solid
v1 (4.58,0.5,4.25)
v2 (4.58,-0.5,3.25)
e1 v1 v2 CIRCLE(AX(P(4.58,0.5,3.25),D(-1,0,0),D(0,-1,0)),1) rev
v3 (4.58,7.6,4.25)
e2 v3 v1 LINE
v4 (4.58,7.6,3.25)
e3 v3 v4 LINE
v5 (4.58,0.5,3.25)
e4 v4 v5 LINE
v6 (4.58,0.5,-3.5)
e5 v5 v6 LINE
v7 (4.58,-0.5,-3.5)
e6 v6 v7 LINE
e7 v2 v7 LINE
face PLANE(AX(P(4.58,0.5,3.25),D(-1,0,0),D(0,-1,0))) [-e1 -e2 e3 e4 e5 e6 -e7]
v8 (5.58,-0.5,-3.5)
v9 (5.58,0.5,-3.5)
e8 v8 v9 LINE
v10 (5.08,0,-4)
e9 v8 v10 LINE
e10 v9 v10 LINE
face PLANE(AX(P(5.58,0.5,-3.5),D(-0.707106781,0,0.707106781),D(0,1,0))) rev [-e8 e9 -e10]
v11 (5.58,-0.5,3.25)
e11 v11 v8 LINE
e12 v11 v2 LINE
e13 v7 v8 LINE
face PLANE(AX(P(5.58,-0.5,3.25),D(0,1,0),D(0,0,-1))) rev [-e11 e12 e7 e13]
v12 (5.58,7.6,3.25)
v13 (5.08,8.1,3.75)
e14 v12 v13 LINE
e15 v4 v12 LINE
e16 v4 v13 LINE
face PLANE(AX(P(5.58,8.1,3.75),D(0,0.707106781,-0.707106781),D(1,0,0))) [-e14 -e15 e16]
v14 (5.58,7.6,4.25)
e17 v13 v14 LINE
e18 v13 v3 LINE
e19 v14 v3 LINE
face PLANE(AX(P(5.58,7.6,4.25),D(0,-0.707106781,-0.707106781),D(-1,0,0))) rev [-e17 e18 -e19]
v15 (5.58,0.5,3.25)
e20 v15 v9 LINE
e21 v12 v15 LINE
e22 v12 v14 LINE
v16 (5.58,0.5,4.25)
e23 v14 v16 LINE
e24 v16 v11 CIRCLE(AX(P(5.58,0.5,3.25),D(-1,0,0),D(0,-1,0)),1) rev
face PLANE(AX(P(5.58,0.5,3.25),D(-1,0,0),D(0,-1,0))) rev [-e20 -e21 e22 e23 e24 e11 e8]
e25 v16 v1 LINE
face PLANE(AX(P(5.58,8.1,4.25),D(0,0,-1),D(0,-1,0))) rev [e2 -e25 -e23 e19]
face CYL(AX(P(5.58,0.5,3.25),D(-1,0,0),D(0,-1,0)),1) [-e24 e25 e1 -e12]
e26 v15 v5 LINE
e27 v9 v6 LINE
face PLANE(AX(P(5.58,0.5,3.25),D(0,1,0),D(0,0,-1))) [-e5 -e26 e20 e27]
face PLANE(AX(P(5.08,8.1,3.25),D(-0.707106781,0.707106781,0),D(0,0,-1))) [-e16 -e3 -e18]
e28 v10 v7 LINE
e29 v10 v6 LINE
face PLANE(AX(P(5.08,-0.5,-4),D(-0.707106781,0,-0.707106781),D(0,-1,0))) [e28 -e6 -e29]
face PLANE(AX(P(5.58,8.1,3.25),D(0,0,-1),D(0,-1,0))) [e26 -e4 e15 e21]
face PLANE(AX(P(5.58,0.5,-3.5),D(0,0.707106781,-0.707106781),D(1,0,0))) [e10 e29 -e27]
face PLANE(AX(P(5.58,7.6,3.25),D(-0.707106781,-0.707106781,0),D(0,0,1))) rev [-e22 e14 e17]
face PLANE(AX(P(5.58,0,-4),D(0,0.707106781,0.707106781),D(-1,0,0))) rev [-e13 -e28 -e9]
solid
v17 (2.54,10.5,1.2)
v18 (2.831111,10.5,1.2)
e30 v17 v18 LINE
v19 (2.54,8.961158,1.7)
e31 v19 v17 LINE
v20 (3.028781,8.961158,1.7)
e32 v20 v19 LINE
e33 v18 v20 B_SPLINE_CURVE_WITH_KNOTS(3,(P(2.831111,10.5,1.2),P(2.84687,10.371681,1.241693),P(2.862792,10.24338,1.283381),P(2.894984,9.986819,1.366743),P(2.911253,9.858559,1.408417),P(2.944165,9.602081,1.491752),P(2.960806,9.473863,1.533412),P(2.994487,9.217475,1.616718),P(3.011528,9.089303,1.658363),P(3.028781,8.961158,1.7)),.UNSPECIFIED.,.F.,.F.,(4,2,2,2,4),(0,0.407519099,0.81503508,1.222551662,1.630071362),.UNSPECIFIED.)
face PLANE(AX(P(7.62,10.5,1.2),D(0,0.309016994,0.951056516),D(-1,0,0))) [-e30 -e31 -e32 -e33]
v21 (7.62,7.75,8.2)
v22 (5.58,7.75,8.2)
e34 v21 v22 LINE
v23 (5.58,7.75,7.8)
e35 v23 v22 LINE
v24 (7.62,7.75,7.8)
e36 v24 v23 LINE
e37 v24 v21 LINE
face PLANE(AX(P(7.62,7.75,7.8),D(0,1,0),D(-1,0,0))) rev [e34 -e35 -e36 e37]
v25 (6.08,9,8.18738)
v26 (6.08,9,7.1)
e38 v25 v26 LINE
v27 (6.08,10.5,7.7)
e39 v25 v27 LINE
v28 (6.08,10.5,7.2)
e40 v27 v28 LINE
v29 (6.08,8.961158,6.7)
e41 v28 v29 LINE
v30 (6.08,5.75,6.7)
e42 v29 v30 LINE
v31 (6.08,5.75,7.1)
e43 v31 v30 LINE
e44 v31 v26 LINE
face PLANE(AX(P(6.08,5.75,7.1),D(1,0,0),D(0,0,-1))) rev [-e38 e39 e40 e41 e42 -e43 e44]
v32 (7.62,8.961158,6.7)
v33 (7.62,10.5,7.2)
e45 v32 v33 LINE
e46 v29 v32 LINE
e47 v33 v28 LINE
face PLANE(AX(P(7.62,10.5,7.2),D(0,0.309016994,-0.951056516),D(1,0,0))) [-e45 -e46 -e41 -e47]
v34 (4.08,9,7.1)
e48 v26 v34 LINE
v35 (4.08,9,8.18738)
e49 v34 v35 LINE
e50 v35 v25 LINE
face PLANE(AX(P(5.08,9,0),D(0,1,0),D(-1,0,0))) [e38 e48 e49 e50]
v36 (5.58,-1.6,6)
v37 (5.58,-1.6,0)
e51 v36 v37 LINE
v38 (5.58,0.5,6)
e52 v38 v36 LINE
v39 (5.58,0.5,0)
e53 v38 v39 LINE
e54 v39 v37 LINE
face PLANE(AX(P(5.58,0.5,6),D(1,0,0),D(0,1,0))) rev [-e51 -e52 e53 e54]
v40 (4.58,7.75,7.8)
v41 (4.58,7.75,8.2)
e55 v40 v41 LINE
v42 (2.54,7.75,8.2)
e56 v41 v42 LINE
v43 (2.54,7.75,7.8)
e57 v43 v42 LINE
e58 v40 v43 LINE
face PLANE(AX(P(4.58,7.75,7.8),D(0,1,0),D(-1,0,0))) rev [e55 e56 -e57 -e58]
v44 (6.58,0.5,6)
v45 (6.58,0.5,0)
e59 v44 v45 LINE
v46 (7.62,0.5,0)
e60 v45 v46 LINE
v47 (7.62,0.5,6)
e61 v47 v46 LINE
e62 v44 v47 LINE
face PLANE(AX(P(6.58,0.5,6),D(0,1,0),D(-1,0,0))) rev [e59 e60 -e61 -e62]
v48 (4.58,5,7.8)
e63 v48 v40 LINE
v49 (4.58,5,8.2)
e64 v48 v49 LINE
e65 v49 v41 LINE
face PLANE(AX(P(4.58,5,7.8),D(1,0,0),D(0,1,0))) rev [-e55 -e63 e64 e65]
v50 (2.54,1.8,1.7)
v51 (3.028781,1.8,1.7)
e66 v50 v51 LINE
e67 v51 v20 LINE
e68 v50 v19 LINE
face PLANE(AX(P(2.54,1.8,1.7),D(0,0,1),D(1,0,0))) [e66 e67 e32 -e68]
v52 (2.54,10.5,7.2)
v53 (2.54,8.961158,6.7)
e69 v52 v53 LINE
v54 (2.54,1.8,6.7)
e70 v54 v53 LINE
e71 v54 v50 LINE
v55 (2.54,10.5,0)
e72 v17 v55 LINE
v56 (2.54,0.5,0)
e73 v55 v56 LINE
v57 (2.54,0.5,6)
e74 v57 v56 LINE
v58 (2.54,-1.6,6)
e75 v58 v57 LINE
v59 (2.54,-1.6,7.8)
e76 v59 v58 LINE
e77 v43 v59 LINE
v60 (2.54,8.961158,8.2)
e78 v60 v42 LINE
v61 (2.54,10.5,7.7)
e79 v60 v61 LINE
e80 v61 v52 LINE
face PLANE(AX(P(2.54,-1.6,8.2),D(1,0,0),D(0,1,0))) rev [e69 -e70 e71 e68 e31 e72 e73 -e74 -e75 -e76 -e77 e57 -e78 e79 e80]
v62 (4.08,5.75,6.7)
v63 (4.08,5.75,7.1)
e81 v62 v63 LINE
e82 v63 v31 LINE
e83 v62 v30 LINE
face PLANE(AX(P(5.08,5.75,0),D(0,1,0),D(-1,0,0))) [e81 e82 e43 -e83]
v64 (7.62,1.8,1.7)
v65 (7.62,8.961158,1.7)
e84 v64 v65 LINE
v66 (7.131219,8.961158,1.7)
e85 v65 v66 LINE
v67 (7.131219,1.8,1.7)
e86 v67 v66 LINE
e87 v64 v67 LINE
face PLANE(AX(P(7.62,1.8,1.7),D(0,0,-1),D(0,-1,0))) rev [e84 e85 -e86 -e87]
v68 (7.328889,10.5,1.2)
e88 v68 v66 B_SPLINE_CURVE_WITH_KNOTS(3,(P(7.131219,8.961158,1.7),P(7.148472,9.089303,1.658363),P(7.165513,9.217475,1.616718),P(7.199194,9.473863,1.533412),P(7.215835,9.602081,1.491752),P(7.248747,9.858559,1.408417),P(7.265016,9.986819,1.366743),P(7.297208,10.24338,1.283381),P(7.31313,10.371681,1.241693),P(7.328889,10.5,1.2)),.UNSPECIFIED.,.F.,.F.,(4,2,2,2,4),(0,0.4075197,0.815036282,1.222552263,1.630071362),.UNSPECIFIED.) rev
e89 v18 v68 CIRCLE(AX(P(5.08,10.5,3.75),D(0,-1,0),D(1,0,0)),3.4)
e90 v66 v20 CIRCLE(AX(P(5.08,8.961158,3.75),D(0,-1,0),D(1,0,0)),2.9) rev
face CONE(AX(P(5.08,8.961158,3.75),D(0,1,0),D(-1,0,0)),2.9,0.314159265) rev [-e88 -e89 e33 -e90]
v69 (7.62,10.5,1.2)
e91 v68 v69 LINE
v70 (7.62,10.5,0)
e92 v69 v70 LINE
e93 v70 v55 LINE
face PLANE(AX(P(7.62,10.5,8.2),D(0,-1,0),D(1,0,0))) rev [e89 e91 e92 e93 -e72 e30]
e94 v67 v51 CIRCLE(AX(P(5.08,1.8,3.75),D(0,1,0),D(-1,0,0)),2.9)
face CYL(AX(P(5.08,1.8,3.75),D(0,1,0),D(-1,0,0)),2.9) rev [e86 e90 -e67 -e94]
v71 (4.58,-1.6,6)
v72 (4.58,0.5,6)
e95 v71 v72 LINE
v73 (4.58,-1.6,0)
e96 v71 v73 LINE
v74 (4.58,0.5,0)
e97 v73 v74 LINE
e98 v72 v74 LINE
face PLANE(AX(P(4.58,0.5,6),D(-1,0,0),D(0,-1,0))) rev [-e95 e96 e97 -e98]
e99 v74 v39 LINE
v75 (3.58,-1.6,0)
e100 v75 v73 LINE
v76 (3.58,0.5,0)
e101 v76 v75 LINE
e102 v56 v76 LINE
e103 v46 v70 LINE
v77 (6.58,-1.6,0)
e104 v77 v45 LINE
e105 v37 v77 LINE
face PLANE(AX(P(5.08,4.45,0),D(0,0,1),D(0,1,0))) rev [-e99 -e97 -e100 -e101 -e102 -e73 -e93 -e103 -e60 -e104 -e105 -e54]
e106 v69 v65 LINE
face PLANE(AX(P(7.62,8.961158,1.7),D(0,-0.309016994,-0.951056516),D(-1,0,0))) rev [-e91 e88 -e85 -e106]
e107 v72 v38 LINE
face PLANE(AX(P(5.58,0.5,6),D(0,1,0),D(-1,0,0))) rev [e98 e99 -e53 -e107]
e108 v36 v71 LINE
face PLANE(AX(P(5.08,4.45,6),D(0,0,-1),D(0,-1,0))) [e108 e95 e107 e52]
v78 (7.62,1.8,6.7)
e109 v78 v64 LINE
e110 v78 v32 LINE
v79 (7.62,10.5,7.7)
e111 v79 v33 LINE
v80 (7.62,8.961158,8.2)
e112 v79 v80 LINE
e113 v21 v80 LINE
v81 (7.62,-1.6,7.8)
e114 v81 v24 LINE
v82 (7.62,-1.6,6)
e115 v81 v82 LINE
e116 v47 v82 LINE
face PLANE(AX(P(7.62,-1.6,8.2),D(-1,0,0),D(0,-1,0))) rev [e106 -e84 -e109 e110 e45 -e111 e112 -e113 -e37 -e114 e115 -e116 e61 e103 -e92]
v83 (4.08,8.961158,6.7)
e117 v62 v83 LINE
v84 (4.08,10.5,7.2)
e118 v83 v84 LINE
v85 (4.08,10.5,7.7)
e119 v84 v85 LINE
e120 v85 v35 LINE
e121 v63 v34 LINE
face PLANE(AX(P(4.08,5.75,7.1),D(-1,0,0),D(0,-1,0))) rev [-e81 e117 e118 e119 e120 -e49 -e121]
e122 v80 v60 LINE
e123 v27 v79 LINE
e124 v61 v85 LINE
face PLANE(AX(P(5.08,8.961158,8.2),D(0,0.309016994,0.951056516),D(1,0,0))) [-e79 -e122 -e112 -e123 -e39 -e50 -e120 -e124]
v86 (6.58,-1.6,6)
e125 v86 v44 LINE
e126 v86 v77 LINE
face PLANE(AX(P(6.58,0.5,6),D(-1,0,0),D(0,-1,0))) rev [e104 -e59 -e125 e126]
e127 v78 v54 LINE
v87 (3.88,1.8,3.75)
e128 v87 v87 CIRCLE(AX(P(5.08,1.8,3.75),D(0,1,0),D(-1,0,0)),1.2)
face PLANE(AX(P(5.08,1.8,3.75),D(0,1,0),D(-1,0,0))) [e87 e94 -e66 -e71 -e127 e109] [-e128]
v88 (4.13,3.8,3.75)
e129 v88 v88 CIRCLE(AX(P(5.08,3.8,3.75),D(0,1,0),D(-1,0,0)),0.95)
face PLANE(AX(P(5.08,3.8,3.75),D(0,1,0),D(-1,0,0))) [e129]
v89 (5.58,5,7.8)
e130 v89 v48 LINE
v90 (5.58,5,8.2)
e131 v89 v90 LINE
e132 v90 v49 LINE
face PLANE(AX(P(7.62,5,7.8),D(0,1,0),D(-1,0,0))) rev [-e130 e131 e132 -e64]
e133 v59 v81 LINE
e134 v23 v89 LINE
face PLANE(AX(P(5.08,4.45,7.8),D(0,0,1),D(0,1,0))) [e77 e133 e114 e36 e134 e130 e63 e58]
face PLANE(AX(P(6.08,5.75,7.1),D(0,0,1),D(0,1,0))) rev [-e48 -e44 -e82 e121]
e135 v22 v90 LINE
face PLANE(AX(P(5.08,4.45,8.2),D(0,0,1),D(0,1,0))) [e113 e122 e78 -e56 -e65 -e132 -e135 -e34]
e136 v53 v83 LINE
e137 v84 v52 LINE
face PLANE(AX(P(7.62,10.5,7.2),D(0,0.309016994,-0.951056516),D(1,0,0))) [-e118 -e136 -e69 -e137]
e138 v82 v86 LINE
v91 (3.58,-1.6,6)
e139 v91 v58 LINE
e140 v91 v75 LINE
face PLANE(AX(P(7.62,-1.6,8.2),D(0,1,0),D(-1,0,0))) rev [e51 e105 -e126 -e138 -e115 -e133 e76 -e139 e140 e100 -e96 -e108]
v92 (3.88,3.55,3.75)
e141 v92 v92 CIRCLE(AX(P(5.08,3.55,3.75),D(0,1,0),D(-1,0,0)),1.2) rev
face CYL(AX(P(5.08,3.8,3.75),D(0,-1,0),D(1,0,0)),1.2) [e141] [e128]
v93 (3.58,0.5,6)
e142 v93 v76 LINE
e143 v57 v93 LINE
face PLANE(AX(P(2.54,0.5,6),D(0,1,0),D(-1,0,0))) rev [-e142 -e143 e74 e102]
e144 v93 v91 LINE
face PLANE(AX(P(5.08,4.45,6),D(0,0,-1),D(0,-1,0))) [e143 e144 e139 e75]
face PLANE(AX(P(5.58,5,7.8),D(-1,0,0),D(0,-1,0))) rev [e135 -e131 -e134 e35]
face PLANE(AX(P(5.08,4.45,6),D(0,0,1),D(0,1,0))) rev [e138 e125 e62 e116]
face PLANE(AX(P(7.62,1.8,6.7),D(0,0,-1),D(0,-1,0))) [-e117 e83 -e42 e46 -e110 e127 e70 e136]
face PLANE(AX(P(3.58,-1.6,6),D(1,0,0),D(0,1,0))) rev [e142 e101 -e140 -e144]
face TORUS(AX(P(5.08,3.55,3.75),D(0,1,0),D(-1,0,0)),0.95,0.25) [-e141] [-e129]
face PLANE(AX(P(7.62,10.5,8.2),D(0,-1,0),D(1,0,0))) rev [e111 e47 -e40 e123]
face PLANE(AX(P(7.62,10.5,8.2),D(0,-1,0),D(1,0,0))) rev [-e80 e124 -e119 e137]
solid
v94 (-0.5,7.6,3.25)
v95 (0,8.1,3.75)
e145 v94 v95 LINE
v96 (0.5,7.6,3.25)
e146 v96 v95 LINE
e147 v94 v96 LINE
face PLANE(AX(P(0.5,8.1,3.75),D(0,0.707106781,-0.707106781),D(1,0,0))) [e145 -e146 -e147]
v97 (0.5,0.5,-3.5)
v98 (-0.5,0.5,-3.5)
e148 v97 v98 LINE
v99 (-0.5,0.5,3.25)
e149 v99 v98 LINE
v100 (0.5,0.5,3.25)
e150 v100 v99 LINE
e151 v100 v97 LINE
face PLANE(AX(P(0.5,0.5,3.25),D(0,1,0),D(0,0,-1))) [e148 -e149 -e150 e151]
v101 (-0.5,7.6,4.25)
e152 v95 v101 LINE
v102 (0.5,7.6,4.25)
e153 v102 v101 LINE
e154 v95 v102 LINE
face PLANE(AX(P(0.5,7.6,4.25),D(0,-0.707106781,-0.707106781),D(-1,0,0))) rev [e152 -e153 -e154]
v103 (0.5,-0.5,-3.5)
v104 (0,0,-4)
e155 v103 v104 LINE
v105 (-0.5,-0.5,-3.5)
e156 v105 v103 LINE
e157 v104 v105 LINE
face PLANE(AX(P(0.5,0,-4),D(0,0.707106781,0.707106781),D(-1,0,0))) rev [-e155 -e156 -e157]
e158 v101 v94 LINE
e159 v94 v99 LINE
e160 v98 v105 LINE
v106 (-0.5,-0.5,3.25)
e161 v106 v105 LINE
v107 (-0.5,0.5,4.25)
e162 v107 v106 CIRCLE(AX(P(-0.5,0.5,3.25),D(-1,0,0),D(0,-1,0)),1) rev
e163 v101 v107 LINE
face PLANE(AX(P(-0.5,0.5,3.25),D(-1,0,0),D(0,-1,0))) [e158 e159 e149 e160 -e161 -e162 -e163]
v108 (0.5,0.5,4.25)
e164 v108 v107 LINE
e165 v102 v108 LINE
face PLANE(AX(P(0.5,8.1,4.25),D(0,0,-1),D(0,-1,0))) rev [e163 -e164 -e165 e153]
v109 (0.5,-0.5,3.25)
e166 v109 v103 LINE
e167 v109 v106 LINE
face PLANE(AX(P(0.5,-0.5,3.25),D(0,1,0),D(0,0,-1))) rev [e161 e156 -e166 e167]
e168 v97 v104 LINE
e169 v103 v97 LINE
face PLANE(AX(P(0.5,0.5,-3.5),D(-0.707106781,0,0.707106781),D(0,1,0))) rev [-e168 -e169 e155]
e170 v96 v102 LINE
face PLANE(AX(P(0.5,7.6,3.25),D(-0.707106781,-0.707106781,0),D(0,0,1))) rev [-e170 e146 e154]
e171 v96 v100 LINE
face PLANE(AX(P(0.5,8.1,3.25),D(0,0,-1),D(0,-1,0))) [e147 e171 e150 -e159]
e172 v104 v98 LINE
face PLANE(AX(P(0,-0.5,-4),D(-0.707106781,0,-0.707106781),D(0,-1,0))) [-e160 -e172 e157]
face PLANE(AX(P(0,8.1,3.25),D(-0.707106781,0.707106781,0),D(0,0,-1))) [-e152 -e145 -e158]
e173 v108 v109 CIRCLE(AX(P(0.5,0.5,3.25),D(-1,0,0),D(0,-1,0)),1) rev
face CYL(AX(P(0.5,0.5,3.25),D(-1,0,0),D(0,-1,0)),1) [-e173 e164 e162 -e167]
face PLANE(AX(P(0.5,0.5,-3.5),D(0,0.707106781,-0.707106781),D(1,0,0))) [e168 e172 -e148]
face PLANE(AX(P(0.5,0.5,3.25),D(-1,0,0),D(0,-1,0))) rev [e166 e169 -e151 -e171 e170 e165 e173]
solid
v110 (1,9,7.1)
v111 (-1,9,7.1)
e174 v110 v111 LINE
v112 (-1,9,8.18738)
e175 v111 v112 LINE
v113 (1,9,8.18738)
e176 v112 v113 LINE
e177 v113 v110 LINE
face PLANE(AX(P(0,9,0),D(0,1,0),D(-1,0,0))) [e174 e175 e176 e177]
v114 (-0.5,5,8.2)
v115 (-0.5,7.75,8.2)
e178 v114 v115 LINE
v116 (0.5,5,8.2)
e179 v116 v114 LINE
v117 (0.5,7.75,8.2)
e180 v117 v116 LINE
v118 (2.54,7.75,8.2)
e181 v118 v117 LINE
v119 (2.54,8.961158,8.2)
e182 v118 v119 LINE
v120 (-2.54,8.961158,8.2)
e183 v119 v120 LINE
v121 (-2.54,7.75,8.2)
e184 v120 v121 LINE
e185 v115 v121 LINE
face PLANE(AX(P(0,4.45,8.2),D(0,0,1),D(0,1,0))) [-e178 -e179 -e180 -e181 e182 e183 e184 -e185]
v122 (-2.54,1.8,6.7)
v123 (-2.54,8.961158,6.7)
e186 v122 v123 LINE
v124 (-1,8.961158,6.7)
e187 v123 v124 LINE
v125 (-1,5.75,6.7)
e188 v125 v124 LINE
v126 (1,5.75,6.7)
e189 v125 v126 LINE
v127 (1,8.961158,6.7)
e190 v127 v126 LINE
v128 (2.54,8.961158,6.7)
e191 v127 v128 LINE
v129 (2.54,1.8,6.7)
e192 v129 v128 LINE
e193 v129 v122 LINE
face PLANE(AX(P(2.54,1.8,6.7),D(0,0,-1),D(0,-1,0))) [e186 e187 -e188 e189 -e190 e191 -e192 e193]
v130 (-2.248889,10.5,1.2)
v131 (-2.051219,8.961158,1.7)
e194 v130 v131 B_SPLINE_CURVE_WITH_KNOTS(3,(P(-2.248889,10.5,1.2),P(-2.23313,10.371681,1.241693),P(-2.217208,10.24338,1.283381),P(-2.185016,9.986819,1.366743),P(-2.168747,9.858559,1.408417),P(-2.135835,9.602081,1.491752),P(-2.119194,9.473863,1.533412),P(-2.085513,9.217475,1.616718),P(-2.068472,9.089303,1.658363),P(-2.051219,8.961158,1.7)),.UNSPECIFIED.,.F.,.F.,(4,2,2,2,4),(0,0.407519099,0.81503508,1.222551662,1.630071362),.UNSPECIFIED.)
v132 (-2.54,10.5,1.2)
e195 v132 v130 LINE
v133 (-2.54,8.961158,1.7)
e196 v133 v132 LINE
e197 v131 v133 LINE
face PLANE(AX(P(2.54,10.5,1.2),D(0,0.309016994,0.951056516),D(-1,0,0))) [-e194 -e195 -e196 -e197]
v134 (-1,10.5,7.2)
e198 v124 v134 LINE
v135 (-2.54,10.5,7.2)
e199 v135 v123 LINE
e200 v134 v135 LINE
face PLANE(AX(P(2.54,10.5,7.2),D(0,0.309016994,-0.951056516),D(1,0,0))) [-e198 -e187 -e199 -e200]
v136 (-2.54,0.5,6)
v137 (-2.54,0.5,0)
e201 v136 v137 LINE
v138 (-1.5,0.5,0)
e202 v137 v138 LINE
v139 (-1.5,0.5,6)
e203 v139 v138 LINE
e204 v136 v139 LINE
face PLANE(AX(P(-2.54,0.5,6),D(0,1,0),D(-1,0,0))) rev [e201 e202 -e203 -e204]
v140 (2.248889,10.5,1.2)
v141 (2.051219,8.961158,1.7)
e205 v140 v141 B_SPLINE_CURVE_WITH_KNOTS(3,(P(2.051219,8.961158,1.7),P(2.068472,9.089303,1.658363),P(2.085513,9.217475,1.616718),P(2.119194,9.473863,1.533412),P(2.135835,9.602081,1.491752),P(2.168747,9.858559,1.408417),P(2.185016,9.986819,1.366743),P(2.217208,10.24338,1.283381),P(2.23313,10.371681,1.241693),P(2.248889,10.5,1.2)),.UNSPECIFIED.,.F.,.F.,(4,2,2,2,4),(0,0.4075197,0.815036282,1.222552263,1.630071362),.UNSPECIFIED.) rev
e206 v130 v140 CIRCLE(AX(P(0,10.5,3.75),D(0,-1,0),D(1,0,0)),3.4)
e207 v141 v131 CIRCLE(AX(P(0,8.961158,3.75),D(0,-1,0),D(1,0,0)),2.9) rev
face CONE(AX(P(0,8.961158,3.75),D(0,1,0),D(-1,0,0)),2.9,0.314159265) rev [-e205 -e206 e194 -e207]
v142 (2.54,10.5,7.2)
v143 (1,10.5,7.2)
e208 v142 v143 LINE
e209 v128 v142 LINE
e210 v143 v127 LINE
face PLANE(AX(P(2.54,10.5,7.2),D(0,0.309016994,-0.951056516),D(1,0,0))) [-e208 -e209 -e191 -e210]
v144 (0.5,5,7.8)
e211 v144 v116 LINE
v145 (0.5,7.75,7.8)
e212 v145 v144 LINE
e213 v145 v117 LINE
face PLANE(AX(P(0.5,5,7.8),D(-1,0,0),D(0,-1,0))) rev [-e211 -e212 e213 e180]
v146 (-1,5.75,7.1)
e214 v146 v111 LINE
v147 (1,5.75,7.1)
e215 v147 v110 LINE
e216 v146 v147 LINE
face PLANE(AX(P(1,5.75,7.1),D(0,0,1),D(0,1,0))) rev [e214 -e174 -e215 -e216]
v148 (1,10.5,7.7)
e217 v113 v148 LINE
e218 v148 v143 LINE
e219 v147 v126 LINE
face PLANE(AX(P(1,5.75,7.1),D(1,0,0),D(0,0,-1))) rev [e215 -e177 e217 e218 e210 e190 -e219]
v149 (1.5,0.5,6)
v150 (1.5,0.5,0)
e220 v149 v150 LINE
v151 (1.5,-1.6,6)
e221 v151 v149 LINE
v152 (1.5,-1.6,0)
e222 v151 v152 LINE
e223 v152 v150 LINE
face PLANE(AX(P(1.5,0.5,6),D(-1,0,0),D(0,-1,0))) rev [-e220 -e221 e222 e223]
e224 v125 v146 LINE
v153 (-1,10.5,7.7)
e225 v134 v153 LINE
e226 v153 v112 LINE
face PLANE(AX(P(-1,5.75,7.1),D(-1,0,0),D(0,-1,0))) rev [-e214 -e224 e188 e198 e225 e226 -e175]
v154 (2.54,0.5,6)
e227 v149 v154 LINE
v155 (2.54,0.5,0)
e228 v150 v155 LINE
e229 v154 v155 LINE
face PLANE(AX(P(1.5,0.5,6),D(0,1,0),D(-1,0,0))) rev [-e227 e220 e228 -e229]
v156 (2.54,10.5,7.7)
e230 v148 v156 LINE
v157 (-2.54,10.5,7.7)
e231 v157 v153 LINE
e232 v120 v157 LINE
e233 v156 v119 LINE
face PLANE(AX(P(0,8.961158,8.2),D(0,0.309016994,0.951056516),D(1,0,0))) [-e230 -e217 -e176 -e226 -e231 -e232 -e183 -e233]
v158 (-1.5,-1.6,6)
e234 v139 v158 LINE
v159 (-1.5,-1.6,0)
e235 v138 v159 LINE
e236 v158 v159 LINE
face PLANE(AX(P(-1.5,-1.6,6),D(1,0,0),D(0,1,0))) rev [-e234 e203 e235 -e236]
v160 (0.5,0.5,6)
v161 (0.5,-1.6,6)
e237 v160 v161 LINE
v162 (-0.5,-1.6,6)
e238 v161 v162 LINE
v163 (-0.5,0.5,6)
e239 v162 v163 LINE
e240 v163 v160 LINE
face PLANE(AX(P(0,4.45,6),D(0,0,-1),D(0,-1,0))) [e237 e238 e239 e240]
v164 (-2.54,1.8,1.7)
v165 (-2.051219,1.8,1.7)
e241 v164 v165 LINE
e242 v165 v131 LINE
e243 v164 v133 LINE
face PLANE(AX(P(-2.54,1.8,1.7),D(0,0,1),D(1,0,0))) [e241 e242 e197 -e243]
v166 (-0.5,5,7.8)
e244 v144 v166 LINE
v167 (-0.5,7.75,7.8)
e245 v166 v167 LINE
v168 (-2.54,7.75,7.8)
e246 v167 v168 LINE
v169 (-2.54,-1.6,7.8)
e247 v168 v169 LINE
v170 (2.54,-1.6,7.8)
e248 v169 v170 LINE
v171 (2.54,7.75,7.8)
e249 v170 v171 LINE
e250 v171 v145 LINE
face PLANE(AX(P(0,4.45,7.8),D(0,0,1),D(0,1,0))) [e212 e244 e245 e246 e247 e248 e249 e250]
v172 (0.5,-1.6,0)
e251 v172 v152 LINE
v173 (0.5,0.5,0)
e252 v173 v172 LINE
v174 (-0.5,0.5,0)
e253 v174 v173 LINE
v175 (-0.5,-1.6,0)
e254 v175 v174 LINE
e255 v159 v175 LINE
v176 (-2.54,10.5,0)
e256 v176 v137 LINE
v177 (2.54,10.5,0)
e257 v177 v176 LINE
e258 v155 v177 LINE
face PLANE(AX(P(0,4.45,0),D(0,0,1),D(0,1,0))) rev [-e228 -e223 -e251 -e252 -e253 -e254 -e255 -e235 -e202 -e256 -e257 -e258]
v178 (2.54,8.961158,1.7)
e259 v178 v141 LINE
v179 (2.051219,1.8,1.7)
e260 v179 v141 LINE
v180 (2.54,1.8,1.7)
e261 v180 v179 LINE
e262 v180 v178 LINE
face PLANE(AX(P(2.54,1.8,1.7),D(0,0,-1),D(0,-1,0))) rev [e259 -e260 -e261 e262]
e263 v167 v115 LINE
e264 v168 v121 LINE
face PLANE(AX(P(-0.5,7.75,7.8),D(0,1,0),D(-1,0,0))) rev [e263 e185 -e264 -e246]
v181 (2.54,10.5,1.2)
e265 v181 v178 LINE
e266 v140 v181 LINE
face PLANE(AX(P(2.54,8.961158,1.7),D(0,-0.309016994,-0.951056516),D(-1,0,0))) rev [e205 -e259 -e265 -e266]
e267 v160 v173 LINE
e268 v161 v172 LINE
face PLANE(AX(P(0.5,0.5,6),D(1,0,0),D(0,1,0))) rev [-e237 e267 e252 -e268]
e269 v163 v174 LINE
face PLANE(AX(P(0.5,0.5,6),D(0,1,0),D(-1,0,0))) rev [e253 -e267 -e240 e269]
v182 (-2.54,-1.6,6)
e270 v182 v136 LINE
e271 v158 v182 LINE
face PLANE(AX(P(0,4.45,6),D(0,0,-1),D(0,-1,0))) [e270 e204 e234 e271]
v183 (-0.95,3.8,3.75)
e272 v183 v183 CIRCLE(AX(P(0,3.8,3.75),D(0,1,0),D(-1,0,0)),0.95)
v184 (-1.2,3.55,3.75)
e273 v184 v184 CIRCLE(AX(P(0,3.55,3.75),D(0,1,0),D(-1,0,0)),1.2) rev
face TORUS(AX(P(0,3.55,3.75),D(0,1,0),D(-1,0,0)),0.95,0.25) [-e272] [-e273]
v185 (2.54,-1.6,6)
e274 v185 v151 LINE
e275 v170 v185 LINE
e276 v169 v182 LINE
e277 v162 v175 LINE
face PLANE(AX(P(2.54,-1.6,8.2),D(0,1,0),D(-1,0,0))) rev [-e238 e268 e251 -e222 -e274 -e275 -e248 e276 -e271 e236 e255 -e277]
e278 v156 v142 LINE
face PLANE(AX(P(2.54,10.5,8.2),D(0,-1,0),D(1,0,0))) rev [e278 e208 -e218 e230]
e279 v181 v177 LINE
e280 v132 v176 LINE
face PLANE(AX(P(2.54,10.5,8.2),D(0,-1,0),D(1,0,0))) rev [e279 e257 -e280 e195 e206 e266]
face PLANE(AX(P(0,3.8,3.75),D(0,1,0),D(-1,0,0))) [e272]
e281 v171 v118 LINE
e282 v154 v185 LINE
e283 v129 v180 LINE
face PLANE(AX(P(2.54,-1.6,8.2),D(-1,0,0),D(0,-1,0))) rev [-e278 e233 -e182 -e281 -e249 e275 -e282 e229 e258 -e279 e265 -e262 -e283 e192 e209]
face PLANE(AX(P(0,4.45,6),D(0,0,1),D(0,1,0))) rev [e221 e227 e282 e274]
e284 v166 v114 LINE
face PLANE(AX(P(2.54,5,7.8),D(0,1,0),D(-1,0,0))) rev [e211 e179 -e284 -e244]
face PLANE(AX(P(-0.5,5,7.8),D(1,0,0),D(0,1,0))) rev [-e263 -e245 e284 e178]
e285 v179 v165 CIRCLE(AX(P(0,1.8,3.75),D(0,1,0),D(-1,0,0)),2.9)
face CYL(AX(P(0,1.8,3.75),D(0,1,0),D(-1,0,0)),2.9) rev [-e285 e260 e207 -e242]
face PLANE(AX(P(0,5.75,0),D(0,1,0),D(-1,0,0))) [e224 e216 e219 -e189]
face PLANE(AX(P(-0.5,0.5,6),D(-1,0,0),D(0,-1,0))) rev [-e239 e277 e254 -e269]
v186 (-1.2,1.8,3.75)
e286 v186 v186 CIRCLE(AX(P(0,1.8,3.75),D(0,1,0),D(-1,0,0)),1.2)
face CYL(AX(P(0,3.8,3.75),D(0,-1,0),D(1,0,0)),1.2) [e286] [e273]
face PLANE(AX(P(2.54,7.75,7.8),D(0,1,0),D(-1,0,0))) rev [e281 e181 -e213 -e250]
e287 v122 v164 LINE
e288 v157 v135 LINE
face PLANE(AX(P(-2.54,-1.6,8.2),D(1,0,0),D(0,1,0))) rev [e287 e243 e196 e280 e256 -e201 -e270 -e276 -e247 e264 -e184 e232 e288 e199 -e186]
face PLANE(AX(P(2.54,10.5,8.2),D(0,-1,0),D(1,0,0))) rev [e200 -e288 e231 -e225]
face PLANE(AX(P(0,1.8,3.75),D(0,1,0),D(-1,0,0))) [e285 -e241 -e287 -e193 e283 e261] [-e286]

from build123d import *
from OCP.BRepFilletAPI import BRepFilletAPI_MakeChamfer

# Parameters (mm, degrees)
SKETCH_1_W             = 5.08
SKETCH_1_H             = 12.1
EXTRUDE_1_DEPTH        = 8.2
CUT_EXTRUDE_1_DEPTH    = 8.7
SKETCH_3_R             = 1.2
EXTRUDE_2_DEPTH        = 2
FILLET_1_R             = 0.25
CHAMFER_1_SIZE         = 0.5
CHAMFER_1_SIZE2        = 1.538841769
SKETCH_4_W             = 2
SKETCH_4_H             = 1.010953213
CUT_EXTRUDE_2_DEPTH    = 4.75
SKETCH_5_W             = 2
SKETCH_5_H             = 1.705458635
CUT_EXTRUDE_3_DEPTH    = 1.5
CHAMFER_2_SIZE         = 0.5
CHAMFER_2_SIZE2        = 1.538841769
SKETCH_6_W             = 5.08
SKETCH_6_H             = 6.6
CUT_EXTRUDE_4_DEPTH    = 0.4
SKETCH_7_W             = 2.04
SKETCH_7_H             = 2.75
CUT_EXTRUDE_5_DEPTH    = 0.4
EXTRUDE_1_2_DEPTH      = 0.5
EXTRUDE_1_2_DEPTH_BACK = 0.5
CHAMFER_3_SIZE         = 0.5
SKETCH_9_W             = 1
SKETCH_9_H             = 2.1
SKETCH_9_W_2           = 1.04
CUT_EXTRUDE_6_DEPTH    = 6
PATTERN_LINEAR_1_COUNT = 2
PATTERN_LINEAR_1_PITCH = 5.08
MOVE_BODY_1_ANGLE      = 180


with BuildPart() as part:
    # Эскиз1 → Extrude 1 (new body)
    with BuildSketch(Plane(origin=(0, 0, 0), x_dir=(1, 0, 0), z_dir=(0, 1, 0))):
        Rectangle(SKETCH_1_W, SKETCH_1_H)
    extrude(amount=EXTRUDE_1_DEPTH)

    # Эскиз2 → Вырез-Вытянуть1 (cut)
    with BuildSketch(Plane.XY.offset(6.05)):
        with BuildLine():
            Line((-2.54, 6.7), (2.54, 6.7))
            Line((2.54, 6.7), (2.54, 1.7))
            Line((2.54, 1.7), (2.05121915, 1.7))
            ThreePointArc((2.05121915, 1.7), (0, 0.85), (-2.05121915, 1.7))
            Line((-2.05121915, 1.7), (-2.54, 1.7))
            Line((-2.54, 1.7), (-2.54, 6.7))
        make_face()
    extrude(amount=-CUT_EXTRUDE_1_DEPTH, mode=Mode.SUBTRACT)

    # Эскиз3 → Бобышка-Вытянуть2 (add)
    with BuildSketch(Plane.XY.offset(-2.65)):
        with Locations((0, 3.75)):
            Circle(SKETCH_3_R)
    extrude(amount=EXTRUDE_2_DEPTH)

    # Скругление1
    fillet_1_edges = [part.edges().sort_by_distance(p)[0] for p in [
        (-1.2, 3.75, -0.65),
    ]]
    fillet(fillet_1_edges, radius=FILLET_1_R)

    # Фаска1: one chamfer whose edges measure the first distance from different faces: ONE call of the kernel's chamfer builder (chamfer() names one face for all edges)
    chamfer_1_edges_1 = [part.edges().sort_by_distance(p)[0] for p in [
        (0, 6.7, 6.05),
    ]]
    chamfer_1_side_1 = [part.faces().sort_by_distance(p)[0] for p in [
        (0, 7.45, 6.05),
    ]]
    chamfer_1_edges_2 = [part.edges().sort_by_distance(p)[0] for p in [
        (2.295609575, 1.7, 6.05),
        (-2.295609575, 1.7, 6.05),
        (0, 0.85, 6.05),
    ]]
    chamfer_1_side_2 = [part.faces().sort_by_distance(p)[0] for p in [
        (0, 0.655214235, 6.05),
    ]]
    chamfer_1 = BRepFilletAPI_MakeChamfer(part.part.solid().wrapped)
    for e in chamfer_1_edges_1:
        chamfer_1.Add(CHAMFER_1_SIZE, CHAMFER_1_SIZE2, e.wrapped, chamfer_1_side_1[0].wrapped)  # the first distance lies on this face
    for e in chamfer_1_edges_2:
        chamfer_1.Add(CHAMFER_1_SIZE, CHAMFER_1_SIZE2, e.wrapped, chamfer_1_side_2[0].wrapped)  # the first distance lies on this face
    add(Compound.cast(chamfer_1.Shape()), mode=Mode.REPLACE)

    # Эскиз4 → Вырез-Вытянуть2 (cut)
    with BuildSketch(Plane.XY.offset(6.05)):
        with Locations((0, 6.594523394)):
            Rectangle(SKETCH_4_W, SKETCH_4_H)
    extrude(amount=-CUT_EXTRUDE_2_DEPTH, mode=Mode.SUBTRACT)

    # Эскиз5 → Вырез-Вытянуть3 (cut)
    with BuildSketch(Plane.XY.offset(6.05)):
        with Locations((0, 7.552729318)):
            Rectangle(SKETCH_5_W, SKETCH_5_H)
    extrude(amount=-CUT_EXTRUDE_3_DEPTH, mode=Mode.SUBTRACT)

    # Фаска2
    chamfer_2_edges = [part.edges().sort_by_distance(p)[0] for p in [
        (-1.77, 8.2, 6.05),
    ]]
    chamfer_2_side = [part.faces().sort_by_distance(p)[0] for p in [
        (-1.77, 7.7, 6.05),
    ]]
    chamfer(chamfer_2_edges, length=CHAMFER_2_SIZE, length2=CHAMFER_2_SIZE2, reference=chamfer_2_side[0])

    # Эскиз6 → Вырез-Вытянуть4 (cut)
    with BuildSketch(Plane(origin=(0, 8.2, 0), x_dir=(1, 0, 0), z_dir=(0, 1, 0))):
        with Locations((0, 2.75)):
            Rectangle(SKETCH_6_W, SKETCH_6_H)
    extrude(amount=-CUT_EXTRUDE_4_DEPTH, mode=Mode.SUBTRACT)

    # Эскиз7 → Вырез-Вытянуть5 (cut)
    with BuildSketch(Plane(origin=(0, 8.2, 0), x_dir=(1, 0, 0), z_dir=(0, 1, 0))):
        with Locations((1.52, -1.925)):
            Rectangle(SKETCH_7_W, SKETCH_7_H)
        with Locations((-1.52, -1.925)):
            Rectangle(SKETCH_7_W, SKETCH_7_H)
    extrude(amount=-CUT_EXTRUDE_5_DEPTH, mode=Mode.SUBTRACT)

    # Эскиз9 → Вырез-Вытянуть6 (cut)
    with BuildSketch(Plane.XZ):
        with Locations((0, -5)):
            Rectangle(SKETCH_9_W, SKETCH_9_H)
        with Locations((-2.02, -5)):
            Rectangle(SKETCH_9_W_2, SKETCH_9_H)
        with Locations((2.02, -5)):
            Rectangle(SKETCH_9_W_2, SKETCH_9_H)
    extrude(amount=-CUT_EXTRUDE_6_DEPTH, mode=Mode.SUBTRACT)


with BuildPart() as body_2:
    # Эскиз8 → Extrude 1 2 (new, two sides: drawn at the far end of the back side and taken through both)
    with BuildSketch(Plane(origin=(0, 0, 0), x_dir=(0, 0, -1), z_dir=(1, 0, 0)).offset(-EXTRUDE_1_2_DEPTH_BACK)):
        with BuildLine():
            Line((-3.65, 3.25), (3.95, 3.25))
            Line((3.95, 3.25), (3.95, -4))
            Line((3.95, -4), (4.95, -4))
            Line((4.95, -4), (4.95, 3.25))
            ThreePointArc((4.95, 3.25), (4.657106781, 3.957106781), (3.95, 4.25))
            Line((3.95, 4.25), (-3.65, 4.25))
            Line((-3.65, 4.25), (-3.65, 3.25))
        make_face()
    extrude(amount=EXTRUDE_1_2_DEPTH + EXTRUDE_1_2_DEPTH_BACK)

    # Фаска3
    chamfer_3_edges = [body_2.edges().sort_by_distance(p)[0] for p in [
        (0, 3.25, 3.65),
        (0, 4.25, 3.65),
        (0, -4, -4.95),
        (0, -4, -3.95),
        (0.5, -4, -4.45),
        (0.5, 3.75, 3.65),
        (-0.5, 3.75, 3.65),
        (-0.5, -4, -4.45),
    ]]
    chamfer(chamfer_3_edges, length=CHAMFER_3_SIZE - 0.0001)  # a hair under: the kernel refuses the full size


with BuildPart() as pattern_linear_1_1:
    # Линейный массив1: pattern copy
    add(body_2.part.moved(Location(Vector(-1, 0, 0) * (1 * PATTERN_LINEAR_1_PITCH))))


with BuildPart() as pattern_linear_1_2:
    # Линейный массив1: pattern copy
    add(part.part.moved(Location(Vector(-1, 0, 0) * (1 * PATTERN_LINEAR_1_PITCH))))


with BuildPart() as body_2_1:
    # Move Body 1: moved
    add(body_2.part.rotate(Axis((0, 0, 0), (0, 0.7071067811865488, 0.7071067811865462)), MOVE_BODY_1_ANGLE))


with BuildPart() as part_1:
    # Move Body 1: moved
    add(part.part.rotate(Axis((0, 0, 0), (0, 0.7071067811865488, 0.7071067811865462)), MOVE_BODY_1_ANGLE))


with BuildPart() as pattern_linear_1_1_1:
    # Move Body 1: moved
    add(pattern_linear_1_1.part.rotate(Axis((0, 0, 0), (0, 0.7071067811865488, 0.7071067811865462)), MOVE_BODY_1_ANGLE))


with BuildPart() as pattern_linear_1_2_1:
    # Move Body 1: moved
    add(pattern_linear_1_2.part.rotate(Axis((0, 0, 0), (0, 0.7071067811865488, 0.7071067811865462)), MOVE_BODY_1_ANGLE))


with BuildPart() as pattern_linear_1_2_2:
    # Move Body 2: read off the stored shape, not the designer's step
    # Move Body 2: moved
    add(pattern_linear_1_2_1.part.moved(Location((0, 4.45, 0))))


with BuildPart() as pattern_linear_1_1_2:
    # Move Body 2 2: moved
    add(pattern_linear_1_1_1.part.moved(Location((0, 4.45, 0))))


with BuildPart() as part_2:
    # Move Body 2 3: moved
    add(part_1.part.moved(Location((0, 4.45, 0))))


with BuildPart() as body_2_2:
    # Move Body 2 4: moved
    add(body_2_1.part.moved(Location((0, 4.45, 0))))


solid = Compound([pattern_linear_1_2_2.part, pattern_linear_1_1_2.part, part_2.part, body_2_2.part])
